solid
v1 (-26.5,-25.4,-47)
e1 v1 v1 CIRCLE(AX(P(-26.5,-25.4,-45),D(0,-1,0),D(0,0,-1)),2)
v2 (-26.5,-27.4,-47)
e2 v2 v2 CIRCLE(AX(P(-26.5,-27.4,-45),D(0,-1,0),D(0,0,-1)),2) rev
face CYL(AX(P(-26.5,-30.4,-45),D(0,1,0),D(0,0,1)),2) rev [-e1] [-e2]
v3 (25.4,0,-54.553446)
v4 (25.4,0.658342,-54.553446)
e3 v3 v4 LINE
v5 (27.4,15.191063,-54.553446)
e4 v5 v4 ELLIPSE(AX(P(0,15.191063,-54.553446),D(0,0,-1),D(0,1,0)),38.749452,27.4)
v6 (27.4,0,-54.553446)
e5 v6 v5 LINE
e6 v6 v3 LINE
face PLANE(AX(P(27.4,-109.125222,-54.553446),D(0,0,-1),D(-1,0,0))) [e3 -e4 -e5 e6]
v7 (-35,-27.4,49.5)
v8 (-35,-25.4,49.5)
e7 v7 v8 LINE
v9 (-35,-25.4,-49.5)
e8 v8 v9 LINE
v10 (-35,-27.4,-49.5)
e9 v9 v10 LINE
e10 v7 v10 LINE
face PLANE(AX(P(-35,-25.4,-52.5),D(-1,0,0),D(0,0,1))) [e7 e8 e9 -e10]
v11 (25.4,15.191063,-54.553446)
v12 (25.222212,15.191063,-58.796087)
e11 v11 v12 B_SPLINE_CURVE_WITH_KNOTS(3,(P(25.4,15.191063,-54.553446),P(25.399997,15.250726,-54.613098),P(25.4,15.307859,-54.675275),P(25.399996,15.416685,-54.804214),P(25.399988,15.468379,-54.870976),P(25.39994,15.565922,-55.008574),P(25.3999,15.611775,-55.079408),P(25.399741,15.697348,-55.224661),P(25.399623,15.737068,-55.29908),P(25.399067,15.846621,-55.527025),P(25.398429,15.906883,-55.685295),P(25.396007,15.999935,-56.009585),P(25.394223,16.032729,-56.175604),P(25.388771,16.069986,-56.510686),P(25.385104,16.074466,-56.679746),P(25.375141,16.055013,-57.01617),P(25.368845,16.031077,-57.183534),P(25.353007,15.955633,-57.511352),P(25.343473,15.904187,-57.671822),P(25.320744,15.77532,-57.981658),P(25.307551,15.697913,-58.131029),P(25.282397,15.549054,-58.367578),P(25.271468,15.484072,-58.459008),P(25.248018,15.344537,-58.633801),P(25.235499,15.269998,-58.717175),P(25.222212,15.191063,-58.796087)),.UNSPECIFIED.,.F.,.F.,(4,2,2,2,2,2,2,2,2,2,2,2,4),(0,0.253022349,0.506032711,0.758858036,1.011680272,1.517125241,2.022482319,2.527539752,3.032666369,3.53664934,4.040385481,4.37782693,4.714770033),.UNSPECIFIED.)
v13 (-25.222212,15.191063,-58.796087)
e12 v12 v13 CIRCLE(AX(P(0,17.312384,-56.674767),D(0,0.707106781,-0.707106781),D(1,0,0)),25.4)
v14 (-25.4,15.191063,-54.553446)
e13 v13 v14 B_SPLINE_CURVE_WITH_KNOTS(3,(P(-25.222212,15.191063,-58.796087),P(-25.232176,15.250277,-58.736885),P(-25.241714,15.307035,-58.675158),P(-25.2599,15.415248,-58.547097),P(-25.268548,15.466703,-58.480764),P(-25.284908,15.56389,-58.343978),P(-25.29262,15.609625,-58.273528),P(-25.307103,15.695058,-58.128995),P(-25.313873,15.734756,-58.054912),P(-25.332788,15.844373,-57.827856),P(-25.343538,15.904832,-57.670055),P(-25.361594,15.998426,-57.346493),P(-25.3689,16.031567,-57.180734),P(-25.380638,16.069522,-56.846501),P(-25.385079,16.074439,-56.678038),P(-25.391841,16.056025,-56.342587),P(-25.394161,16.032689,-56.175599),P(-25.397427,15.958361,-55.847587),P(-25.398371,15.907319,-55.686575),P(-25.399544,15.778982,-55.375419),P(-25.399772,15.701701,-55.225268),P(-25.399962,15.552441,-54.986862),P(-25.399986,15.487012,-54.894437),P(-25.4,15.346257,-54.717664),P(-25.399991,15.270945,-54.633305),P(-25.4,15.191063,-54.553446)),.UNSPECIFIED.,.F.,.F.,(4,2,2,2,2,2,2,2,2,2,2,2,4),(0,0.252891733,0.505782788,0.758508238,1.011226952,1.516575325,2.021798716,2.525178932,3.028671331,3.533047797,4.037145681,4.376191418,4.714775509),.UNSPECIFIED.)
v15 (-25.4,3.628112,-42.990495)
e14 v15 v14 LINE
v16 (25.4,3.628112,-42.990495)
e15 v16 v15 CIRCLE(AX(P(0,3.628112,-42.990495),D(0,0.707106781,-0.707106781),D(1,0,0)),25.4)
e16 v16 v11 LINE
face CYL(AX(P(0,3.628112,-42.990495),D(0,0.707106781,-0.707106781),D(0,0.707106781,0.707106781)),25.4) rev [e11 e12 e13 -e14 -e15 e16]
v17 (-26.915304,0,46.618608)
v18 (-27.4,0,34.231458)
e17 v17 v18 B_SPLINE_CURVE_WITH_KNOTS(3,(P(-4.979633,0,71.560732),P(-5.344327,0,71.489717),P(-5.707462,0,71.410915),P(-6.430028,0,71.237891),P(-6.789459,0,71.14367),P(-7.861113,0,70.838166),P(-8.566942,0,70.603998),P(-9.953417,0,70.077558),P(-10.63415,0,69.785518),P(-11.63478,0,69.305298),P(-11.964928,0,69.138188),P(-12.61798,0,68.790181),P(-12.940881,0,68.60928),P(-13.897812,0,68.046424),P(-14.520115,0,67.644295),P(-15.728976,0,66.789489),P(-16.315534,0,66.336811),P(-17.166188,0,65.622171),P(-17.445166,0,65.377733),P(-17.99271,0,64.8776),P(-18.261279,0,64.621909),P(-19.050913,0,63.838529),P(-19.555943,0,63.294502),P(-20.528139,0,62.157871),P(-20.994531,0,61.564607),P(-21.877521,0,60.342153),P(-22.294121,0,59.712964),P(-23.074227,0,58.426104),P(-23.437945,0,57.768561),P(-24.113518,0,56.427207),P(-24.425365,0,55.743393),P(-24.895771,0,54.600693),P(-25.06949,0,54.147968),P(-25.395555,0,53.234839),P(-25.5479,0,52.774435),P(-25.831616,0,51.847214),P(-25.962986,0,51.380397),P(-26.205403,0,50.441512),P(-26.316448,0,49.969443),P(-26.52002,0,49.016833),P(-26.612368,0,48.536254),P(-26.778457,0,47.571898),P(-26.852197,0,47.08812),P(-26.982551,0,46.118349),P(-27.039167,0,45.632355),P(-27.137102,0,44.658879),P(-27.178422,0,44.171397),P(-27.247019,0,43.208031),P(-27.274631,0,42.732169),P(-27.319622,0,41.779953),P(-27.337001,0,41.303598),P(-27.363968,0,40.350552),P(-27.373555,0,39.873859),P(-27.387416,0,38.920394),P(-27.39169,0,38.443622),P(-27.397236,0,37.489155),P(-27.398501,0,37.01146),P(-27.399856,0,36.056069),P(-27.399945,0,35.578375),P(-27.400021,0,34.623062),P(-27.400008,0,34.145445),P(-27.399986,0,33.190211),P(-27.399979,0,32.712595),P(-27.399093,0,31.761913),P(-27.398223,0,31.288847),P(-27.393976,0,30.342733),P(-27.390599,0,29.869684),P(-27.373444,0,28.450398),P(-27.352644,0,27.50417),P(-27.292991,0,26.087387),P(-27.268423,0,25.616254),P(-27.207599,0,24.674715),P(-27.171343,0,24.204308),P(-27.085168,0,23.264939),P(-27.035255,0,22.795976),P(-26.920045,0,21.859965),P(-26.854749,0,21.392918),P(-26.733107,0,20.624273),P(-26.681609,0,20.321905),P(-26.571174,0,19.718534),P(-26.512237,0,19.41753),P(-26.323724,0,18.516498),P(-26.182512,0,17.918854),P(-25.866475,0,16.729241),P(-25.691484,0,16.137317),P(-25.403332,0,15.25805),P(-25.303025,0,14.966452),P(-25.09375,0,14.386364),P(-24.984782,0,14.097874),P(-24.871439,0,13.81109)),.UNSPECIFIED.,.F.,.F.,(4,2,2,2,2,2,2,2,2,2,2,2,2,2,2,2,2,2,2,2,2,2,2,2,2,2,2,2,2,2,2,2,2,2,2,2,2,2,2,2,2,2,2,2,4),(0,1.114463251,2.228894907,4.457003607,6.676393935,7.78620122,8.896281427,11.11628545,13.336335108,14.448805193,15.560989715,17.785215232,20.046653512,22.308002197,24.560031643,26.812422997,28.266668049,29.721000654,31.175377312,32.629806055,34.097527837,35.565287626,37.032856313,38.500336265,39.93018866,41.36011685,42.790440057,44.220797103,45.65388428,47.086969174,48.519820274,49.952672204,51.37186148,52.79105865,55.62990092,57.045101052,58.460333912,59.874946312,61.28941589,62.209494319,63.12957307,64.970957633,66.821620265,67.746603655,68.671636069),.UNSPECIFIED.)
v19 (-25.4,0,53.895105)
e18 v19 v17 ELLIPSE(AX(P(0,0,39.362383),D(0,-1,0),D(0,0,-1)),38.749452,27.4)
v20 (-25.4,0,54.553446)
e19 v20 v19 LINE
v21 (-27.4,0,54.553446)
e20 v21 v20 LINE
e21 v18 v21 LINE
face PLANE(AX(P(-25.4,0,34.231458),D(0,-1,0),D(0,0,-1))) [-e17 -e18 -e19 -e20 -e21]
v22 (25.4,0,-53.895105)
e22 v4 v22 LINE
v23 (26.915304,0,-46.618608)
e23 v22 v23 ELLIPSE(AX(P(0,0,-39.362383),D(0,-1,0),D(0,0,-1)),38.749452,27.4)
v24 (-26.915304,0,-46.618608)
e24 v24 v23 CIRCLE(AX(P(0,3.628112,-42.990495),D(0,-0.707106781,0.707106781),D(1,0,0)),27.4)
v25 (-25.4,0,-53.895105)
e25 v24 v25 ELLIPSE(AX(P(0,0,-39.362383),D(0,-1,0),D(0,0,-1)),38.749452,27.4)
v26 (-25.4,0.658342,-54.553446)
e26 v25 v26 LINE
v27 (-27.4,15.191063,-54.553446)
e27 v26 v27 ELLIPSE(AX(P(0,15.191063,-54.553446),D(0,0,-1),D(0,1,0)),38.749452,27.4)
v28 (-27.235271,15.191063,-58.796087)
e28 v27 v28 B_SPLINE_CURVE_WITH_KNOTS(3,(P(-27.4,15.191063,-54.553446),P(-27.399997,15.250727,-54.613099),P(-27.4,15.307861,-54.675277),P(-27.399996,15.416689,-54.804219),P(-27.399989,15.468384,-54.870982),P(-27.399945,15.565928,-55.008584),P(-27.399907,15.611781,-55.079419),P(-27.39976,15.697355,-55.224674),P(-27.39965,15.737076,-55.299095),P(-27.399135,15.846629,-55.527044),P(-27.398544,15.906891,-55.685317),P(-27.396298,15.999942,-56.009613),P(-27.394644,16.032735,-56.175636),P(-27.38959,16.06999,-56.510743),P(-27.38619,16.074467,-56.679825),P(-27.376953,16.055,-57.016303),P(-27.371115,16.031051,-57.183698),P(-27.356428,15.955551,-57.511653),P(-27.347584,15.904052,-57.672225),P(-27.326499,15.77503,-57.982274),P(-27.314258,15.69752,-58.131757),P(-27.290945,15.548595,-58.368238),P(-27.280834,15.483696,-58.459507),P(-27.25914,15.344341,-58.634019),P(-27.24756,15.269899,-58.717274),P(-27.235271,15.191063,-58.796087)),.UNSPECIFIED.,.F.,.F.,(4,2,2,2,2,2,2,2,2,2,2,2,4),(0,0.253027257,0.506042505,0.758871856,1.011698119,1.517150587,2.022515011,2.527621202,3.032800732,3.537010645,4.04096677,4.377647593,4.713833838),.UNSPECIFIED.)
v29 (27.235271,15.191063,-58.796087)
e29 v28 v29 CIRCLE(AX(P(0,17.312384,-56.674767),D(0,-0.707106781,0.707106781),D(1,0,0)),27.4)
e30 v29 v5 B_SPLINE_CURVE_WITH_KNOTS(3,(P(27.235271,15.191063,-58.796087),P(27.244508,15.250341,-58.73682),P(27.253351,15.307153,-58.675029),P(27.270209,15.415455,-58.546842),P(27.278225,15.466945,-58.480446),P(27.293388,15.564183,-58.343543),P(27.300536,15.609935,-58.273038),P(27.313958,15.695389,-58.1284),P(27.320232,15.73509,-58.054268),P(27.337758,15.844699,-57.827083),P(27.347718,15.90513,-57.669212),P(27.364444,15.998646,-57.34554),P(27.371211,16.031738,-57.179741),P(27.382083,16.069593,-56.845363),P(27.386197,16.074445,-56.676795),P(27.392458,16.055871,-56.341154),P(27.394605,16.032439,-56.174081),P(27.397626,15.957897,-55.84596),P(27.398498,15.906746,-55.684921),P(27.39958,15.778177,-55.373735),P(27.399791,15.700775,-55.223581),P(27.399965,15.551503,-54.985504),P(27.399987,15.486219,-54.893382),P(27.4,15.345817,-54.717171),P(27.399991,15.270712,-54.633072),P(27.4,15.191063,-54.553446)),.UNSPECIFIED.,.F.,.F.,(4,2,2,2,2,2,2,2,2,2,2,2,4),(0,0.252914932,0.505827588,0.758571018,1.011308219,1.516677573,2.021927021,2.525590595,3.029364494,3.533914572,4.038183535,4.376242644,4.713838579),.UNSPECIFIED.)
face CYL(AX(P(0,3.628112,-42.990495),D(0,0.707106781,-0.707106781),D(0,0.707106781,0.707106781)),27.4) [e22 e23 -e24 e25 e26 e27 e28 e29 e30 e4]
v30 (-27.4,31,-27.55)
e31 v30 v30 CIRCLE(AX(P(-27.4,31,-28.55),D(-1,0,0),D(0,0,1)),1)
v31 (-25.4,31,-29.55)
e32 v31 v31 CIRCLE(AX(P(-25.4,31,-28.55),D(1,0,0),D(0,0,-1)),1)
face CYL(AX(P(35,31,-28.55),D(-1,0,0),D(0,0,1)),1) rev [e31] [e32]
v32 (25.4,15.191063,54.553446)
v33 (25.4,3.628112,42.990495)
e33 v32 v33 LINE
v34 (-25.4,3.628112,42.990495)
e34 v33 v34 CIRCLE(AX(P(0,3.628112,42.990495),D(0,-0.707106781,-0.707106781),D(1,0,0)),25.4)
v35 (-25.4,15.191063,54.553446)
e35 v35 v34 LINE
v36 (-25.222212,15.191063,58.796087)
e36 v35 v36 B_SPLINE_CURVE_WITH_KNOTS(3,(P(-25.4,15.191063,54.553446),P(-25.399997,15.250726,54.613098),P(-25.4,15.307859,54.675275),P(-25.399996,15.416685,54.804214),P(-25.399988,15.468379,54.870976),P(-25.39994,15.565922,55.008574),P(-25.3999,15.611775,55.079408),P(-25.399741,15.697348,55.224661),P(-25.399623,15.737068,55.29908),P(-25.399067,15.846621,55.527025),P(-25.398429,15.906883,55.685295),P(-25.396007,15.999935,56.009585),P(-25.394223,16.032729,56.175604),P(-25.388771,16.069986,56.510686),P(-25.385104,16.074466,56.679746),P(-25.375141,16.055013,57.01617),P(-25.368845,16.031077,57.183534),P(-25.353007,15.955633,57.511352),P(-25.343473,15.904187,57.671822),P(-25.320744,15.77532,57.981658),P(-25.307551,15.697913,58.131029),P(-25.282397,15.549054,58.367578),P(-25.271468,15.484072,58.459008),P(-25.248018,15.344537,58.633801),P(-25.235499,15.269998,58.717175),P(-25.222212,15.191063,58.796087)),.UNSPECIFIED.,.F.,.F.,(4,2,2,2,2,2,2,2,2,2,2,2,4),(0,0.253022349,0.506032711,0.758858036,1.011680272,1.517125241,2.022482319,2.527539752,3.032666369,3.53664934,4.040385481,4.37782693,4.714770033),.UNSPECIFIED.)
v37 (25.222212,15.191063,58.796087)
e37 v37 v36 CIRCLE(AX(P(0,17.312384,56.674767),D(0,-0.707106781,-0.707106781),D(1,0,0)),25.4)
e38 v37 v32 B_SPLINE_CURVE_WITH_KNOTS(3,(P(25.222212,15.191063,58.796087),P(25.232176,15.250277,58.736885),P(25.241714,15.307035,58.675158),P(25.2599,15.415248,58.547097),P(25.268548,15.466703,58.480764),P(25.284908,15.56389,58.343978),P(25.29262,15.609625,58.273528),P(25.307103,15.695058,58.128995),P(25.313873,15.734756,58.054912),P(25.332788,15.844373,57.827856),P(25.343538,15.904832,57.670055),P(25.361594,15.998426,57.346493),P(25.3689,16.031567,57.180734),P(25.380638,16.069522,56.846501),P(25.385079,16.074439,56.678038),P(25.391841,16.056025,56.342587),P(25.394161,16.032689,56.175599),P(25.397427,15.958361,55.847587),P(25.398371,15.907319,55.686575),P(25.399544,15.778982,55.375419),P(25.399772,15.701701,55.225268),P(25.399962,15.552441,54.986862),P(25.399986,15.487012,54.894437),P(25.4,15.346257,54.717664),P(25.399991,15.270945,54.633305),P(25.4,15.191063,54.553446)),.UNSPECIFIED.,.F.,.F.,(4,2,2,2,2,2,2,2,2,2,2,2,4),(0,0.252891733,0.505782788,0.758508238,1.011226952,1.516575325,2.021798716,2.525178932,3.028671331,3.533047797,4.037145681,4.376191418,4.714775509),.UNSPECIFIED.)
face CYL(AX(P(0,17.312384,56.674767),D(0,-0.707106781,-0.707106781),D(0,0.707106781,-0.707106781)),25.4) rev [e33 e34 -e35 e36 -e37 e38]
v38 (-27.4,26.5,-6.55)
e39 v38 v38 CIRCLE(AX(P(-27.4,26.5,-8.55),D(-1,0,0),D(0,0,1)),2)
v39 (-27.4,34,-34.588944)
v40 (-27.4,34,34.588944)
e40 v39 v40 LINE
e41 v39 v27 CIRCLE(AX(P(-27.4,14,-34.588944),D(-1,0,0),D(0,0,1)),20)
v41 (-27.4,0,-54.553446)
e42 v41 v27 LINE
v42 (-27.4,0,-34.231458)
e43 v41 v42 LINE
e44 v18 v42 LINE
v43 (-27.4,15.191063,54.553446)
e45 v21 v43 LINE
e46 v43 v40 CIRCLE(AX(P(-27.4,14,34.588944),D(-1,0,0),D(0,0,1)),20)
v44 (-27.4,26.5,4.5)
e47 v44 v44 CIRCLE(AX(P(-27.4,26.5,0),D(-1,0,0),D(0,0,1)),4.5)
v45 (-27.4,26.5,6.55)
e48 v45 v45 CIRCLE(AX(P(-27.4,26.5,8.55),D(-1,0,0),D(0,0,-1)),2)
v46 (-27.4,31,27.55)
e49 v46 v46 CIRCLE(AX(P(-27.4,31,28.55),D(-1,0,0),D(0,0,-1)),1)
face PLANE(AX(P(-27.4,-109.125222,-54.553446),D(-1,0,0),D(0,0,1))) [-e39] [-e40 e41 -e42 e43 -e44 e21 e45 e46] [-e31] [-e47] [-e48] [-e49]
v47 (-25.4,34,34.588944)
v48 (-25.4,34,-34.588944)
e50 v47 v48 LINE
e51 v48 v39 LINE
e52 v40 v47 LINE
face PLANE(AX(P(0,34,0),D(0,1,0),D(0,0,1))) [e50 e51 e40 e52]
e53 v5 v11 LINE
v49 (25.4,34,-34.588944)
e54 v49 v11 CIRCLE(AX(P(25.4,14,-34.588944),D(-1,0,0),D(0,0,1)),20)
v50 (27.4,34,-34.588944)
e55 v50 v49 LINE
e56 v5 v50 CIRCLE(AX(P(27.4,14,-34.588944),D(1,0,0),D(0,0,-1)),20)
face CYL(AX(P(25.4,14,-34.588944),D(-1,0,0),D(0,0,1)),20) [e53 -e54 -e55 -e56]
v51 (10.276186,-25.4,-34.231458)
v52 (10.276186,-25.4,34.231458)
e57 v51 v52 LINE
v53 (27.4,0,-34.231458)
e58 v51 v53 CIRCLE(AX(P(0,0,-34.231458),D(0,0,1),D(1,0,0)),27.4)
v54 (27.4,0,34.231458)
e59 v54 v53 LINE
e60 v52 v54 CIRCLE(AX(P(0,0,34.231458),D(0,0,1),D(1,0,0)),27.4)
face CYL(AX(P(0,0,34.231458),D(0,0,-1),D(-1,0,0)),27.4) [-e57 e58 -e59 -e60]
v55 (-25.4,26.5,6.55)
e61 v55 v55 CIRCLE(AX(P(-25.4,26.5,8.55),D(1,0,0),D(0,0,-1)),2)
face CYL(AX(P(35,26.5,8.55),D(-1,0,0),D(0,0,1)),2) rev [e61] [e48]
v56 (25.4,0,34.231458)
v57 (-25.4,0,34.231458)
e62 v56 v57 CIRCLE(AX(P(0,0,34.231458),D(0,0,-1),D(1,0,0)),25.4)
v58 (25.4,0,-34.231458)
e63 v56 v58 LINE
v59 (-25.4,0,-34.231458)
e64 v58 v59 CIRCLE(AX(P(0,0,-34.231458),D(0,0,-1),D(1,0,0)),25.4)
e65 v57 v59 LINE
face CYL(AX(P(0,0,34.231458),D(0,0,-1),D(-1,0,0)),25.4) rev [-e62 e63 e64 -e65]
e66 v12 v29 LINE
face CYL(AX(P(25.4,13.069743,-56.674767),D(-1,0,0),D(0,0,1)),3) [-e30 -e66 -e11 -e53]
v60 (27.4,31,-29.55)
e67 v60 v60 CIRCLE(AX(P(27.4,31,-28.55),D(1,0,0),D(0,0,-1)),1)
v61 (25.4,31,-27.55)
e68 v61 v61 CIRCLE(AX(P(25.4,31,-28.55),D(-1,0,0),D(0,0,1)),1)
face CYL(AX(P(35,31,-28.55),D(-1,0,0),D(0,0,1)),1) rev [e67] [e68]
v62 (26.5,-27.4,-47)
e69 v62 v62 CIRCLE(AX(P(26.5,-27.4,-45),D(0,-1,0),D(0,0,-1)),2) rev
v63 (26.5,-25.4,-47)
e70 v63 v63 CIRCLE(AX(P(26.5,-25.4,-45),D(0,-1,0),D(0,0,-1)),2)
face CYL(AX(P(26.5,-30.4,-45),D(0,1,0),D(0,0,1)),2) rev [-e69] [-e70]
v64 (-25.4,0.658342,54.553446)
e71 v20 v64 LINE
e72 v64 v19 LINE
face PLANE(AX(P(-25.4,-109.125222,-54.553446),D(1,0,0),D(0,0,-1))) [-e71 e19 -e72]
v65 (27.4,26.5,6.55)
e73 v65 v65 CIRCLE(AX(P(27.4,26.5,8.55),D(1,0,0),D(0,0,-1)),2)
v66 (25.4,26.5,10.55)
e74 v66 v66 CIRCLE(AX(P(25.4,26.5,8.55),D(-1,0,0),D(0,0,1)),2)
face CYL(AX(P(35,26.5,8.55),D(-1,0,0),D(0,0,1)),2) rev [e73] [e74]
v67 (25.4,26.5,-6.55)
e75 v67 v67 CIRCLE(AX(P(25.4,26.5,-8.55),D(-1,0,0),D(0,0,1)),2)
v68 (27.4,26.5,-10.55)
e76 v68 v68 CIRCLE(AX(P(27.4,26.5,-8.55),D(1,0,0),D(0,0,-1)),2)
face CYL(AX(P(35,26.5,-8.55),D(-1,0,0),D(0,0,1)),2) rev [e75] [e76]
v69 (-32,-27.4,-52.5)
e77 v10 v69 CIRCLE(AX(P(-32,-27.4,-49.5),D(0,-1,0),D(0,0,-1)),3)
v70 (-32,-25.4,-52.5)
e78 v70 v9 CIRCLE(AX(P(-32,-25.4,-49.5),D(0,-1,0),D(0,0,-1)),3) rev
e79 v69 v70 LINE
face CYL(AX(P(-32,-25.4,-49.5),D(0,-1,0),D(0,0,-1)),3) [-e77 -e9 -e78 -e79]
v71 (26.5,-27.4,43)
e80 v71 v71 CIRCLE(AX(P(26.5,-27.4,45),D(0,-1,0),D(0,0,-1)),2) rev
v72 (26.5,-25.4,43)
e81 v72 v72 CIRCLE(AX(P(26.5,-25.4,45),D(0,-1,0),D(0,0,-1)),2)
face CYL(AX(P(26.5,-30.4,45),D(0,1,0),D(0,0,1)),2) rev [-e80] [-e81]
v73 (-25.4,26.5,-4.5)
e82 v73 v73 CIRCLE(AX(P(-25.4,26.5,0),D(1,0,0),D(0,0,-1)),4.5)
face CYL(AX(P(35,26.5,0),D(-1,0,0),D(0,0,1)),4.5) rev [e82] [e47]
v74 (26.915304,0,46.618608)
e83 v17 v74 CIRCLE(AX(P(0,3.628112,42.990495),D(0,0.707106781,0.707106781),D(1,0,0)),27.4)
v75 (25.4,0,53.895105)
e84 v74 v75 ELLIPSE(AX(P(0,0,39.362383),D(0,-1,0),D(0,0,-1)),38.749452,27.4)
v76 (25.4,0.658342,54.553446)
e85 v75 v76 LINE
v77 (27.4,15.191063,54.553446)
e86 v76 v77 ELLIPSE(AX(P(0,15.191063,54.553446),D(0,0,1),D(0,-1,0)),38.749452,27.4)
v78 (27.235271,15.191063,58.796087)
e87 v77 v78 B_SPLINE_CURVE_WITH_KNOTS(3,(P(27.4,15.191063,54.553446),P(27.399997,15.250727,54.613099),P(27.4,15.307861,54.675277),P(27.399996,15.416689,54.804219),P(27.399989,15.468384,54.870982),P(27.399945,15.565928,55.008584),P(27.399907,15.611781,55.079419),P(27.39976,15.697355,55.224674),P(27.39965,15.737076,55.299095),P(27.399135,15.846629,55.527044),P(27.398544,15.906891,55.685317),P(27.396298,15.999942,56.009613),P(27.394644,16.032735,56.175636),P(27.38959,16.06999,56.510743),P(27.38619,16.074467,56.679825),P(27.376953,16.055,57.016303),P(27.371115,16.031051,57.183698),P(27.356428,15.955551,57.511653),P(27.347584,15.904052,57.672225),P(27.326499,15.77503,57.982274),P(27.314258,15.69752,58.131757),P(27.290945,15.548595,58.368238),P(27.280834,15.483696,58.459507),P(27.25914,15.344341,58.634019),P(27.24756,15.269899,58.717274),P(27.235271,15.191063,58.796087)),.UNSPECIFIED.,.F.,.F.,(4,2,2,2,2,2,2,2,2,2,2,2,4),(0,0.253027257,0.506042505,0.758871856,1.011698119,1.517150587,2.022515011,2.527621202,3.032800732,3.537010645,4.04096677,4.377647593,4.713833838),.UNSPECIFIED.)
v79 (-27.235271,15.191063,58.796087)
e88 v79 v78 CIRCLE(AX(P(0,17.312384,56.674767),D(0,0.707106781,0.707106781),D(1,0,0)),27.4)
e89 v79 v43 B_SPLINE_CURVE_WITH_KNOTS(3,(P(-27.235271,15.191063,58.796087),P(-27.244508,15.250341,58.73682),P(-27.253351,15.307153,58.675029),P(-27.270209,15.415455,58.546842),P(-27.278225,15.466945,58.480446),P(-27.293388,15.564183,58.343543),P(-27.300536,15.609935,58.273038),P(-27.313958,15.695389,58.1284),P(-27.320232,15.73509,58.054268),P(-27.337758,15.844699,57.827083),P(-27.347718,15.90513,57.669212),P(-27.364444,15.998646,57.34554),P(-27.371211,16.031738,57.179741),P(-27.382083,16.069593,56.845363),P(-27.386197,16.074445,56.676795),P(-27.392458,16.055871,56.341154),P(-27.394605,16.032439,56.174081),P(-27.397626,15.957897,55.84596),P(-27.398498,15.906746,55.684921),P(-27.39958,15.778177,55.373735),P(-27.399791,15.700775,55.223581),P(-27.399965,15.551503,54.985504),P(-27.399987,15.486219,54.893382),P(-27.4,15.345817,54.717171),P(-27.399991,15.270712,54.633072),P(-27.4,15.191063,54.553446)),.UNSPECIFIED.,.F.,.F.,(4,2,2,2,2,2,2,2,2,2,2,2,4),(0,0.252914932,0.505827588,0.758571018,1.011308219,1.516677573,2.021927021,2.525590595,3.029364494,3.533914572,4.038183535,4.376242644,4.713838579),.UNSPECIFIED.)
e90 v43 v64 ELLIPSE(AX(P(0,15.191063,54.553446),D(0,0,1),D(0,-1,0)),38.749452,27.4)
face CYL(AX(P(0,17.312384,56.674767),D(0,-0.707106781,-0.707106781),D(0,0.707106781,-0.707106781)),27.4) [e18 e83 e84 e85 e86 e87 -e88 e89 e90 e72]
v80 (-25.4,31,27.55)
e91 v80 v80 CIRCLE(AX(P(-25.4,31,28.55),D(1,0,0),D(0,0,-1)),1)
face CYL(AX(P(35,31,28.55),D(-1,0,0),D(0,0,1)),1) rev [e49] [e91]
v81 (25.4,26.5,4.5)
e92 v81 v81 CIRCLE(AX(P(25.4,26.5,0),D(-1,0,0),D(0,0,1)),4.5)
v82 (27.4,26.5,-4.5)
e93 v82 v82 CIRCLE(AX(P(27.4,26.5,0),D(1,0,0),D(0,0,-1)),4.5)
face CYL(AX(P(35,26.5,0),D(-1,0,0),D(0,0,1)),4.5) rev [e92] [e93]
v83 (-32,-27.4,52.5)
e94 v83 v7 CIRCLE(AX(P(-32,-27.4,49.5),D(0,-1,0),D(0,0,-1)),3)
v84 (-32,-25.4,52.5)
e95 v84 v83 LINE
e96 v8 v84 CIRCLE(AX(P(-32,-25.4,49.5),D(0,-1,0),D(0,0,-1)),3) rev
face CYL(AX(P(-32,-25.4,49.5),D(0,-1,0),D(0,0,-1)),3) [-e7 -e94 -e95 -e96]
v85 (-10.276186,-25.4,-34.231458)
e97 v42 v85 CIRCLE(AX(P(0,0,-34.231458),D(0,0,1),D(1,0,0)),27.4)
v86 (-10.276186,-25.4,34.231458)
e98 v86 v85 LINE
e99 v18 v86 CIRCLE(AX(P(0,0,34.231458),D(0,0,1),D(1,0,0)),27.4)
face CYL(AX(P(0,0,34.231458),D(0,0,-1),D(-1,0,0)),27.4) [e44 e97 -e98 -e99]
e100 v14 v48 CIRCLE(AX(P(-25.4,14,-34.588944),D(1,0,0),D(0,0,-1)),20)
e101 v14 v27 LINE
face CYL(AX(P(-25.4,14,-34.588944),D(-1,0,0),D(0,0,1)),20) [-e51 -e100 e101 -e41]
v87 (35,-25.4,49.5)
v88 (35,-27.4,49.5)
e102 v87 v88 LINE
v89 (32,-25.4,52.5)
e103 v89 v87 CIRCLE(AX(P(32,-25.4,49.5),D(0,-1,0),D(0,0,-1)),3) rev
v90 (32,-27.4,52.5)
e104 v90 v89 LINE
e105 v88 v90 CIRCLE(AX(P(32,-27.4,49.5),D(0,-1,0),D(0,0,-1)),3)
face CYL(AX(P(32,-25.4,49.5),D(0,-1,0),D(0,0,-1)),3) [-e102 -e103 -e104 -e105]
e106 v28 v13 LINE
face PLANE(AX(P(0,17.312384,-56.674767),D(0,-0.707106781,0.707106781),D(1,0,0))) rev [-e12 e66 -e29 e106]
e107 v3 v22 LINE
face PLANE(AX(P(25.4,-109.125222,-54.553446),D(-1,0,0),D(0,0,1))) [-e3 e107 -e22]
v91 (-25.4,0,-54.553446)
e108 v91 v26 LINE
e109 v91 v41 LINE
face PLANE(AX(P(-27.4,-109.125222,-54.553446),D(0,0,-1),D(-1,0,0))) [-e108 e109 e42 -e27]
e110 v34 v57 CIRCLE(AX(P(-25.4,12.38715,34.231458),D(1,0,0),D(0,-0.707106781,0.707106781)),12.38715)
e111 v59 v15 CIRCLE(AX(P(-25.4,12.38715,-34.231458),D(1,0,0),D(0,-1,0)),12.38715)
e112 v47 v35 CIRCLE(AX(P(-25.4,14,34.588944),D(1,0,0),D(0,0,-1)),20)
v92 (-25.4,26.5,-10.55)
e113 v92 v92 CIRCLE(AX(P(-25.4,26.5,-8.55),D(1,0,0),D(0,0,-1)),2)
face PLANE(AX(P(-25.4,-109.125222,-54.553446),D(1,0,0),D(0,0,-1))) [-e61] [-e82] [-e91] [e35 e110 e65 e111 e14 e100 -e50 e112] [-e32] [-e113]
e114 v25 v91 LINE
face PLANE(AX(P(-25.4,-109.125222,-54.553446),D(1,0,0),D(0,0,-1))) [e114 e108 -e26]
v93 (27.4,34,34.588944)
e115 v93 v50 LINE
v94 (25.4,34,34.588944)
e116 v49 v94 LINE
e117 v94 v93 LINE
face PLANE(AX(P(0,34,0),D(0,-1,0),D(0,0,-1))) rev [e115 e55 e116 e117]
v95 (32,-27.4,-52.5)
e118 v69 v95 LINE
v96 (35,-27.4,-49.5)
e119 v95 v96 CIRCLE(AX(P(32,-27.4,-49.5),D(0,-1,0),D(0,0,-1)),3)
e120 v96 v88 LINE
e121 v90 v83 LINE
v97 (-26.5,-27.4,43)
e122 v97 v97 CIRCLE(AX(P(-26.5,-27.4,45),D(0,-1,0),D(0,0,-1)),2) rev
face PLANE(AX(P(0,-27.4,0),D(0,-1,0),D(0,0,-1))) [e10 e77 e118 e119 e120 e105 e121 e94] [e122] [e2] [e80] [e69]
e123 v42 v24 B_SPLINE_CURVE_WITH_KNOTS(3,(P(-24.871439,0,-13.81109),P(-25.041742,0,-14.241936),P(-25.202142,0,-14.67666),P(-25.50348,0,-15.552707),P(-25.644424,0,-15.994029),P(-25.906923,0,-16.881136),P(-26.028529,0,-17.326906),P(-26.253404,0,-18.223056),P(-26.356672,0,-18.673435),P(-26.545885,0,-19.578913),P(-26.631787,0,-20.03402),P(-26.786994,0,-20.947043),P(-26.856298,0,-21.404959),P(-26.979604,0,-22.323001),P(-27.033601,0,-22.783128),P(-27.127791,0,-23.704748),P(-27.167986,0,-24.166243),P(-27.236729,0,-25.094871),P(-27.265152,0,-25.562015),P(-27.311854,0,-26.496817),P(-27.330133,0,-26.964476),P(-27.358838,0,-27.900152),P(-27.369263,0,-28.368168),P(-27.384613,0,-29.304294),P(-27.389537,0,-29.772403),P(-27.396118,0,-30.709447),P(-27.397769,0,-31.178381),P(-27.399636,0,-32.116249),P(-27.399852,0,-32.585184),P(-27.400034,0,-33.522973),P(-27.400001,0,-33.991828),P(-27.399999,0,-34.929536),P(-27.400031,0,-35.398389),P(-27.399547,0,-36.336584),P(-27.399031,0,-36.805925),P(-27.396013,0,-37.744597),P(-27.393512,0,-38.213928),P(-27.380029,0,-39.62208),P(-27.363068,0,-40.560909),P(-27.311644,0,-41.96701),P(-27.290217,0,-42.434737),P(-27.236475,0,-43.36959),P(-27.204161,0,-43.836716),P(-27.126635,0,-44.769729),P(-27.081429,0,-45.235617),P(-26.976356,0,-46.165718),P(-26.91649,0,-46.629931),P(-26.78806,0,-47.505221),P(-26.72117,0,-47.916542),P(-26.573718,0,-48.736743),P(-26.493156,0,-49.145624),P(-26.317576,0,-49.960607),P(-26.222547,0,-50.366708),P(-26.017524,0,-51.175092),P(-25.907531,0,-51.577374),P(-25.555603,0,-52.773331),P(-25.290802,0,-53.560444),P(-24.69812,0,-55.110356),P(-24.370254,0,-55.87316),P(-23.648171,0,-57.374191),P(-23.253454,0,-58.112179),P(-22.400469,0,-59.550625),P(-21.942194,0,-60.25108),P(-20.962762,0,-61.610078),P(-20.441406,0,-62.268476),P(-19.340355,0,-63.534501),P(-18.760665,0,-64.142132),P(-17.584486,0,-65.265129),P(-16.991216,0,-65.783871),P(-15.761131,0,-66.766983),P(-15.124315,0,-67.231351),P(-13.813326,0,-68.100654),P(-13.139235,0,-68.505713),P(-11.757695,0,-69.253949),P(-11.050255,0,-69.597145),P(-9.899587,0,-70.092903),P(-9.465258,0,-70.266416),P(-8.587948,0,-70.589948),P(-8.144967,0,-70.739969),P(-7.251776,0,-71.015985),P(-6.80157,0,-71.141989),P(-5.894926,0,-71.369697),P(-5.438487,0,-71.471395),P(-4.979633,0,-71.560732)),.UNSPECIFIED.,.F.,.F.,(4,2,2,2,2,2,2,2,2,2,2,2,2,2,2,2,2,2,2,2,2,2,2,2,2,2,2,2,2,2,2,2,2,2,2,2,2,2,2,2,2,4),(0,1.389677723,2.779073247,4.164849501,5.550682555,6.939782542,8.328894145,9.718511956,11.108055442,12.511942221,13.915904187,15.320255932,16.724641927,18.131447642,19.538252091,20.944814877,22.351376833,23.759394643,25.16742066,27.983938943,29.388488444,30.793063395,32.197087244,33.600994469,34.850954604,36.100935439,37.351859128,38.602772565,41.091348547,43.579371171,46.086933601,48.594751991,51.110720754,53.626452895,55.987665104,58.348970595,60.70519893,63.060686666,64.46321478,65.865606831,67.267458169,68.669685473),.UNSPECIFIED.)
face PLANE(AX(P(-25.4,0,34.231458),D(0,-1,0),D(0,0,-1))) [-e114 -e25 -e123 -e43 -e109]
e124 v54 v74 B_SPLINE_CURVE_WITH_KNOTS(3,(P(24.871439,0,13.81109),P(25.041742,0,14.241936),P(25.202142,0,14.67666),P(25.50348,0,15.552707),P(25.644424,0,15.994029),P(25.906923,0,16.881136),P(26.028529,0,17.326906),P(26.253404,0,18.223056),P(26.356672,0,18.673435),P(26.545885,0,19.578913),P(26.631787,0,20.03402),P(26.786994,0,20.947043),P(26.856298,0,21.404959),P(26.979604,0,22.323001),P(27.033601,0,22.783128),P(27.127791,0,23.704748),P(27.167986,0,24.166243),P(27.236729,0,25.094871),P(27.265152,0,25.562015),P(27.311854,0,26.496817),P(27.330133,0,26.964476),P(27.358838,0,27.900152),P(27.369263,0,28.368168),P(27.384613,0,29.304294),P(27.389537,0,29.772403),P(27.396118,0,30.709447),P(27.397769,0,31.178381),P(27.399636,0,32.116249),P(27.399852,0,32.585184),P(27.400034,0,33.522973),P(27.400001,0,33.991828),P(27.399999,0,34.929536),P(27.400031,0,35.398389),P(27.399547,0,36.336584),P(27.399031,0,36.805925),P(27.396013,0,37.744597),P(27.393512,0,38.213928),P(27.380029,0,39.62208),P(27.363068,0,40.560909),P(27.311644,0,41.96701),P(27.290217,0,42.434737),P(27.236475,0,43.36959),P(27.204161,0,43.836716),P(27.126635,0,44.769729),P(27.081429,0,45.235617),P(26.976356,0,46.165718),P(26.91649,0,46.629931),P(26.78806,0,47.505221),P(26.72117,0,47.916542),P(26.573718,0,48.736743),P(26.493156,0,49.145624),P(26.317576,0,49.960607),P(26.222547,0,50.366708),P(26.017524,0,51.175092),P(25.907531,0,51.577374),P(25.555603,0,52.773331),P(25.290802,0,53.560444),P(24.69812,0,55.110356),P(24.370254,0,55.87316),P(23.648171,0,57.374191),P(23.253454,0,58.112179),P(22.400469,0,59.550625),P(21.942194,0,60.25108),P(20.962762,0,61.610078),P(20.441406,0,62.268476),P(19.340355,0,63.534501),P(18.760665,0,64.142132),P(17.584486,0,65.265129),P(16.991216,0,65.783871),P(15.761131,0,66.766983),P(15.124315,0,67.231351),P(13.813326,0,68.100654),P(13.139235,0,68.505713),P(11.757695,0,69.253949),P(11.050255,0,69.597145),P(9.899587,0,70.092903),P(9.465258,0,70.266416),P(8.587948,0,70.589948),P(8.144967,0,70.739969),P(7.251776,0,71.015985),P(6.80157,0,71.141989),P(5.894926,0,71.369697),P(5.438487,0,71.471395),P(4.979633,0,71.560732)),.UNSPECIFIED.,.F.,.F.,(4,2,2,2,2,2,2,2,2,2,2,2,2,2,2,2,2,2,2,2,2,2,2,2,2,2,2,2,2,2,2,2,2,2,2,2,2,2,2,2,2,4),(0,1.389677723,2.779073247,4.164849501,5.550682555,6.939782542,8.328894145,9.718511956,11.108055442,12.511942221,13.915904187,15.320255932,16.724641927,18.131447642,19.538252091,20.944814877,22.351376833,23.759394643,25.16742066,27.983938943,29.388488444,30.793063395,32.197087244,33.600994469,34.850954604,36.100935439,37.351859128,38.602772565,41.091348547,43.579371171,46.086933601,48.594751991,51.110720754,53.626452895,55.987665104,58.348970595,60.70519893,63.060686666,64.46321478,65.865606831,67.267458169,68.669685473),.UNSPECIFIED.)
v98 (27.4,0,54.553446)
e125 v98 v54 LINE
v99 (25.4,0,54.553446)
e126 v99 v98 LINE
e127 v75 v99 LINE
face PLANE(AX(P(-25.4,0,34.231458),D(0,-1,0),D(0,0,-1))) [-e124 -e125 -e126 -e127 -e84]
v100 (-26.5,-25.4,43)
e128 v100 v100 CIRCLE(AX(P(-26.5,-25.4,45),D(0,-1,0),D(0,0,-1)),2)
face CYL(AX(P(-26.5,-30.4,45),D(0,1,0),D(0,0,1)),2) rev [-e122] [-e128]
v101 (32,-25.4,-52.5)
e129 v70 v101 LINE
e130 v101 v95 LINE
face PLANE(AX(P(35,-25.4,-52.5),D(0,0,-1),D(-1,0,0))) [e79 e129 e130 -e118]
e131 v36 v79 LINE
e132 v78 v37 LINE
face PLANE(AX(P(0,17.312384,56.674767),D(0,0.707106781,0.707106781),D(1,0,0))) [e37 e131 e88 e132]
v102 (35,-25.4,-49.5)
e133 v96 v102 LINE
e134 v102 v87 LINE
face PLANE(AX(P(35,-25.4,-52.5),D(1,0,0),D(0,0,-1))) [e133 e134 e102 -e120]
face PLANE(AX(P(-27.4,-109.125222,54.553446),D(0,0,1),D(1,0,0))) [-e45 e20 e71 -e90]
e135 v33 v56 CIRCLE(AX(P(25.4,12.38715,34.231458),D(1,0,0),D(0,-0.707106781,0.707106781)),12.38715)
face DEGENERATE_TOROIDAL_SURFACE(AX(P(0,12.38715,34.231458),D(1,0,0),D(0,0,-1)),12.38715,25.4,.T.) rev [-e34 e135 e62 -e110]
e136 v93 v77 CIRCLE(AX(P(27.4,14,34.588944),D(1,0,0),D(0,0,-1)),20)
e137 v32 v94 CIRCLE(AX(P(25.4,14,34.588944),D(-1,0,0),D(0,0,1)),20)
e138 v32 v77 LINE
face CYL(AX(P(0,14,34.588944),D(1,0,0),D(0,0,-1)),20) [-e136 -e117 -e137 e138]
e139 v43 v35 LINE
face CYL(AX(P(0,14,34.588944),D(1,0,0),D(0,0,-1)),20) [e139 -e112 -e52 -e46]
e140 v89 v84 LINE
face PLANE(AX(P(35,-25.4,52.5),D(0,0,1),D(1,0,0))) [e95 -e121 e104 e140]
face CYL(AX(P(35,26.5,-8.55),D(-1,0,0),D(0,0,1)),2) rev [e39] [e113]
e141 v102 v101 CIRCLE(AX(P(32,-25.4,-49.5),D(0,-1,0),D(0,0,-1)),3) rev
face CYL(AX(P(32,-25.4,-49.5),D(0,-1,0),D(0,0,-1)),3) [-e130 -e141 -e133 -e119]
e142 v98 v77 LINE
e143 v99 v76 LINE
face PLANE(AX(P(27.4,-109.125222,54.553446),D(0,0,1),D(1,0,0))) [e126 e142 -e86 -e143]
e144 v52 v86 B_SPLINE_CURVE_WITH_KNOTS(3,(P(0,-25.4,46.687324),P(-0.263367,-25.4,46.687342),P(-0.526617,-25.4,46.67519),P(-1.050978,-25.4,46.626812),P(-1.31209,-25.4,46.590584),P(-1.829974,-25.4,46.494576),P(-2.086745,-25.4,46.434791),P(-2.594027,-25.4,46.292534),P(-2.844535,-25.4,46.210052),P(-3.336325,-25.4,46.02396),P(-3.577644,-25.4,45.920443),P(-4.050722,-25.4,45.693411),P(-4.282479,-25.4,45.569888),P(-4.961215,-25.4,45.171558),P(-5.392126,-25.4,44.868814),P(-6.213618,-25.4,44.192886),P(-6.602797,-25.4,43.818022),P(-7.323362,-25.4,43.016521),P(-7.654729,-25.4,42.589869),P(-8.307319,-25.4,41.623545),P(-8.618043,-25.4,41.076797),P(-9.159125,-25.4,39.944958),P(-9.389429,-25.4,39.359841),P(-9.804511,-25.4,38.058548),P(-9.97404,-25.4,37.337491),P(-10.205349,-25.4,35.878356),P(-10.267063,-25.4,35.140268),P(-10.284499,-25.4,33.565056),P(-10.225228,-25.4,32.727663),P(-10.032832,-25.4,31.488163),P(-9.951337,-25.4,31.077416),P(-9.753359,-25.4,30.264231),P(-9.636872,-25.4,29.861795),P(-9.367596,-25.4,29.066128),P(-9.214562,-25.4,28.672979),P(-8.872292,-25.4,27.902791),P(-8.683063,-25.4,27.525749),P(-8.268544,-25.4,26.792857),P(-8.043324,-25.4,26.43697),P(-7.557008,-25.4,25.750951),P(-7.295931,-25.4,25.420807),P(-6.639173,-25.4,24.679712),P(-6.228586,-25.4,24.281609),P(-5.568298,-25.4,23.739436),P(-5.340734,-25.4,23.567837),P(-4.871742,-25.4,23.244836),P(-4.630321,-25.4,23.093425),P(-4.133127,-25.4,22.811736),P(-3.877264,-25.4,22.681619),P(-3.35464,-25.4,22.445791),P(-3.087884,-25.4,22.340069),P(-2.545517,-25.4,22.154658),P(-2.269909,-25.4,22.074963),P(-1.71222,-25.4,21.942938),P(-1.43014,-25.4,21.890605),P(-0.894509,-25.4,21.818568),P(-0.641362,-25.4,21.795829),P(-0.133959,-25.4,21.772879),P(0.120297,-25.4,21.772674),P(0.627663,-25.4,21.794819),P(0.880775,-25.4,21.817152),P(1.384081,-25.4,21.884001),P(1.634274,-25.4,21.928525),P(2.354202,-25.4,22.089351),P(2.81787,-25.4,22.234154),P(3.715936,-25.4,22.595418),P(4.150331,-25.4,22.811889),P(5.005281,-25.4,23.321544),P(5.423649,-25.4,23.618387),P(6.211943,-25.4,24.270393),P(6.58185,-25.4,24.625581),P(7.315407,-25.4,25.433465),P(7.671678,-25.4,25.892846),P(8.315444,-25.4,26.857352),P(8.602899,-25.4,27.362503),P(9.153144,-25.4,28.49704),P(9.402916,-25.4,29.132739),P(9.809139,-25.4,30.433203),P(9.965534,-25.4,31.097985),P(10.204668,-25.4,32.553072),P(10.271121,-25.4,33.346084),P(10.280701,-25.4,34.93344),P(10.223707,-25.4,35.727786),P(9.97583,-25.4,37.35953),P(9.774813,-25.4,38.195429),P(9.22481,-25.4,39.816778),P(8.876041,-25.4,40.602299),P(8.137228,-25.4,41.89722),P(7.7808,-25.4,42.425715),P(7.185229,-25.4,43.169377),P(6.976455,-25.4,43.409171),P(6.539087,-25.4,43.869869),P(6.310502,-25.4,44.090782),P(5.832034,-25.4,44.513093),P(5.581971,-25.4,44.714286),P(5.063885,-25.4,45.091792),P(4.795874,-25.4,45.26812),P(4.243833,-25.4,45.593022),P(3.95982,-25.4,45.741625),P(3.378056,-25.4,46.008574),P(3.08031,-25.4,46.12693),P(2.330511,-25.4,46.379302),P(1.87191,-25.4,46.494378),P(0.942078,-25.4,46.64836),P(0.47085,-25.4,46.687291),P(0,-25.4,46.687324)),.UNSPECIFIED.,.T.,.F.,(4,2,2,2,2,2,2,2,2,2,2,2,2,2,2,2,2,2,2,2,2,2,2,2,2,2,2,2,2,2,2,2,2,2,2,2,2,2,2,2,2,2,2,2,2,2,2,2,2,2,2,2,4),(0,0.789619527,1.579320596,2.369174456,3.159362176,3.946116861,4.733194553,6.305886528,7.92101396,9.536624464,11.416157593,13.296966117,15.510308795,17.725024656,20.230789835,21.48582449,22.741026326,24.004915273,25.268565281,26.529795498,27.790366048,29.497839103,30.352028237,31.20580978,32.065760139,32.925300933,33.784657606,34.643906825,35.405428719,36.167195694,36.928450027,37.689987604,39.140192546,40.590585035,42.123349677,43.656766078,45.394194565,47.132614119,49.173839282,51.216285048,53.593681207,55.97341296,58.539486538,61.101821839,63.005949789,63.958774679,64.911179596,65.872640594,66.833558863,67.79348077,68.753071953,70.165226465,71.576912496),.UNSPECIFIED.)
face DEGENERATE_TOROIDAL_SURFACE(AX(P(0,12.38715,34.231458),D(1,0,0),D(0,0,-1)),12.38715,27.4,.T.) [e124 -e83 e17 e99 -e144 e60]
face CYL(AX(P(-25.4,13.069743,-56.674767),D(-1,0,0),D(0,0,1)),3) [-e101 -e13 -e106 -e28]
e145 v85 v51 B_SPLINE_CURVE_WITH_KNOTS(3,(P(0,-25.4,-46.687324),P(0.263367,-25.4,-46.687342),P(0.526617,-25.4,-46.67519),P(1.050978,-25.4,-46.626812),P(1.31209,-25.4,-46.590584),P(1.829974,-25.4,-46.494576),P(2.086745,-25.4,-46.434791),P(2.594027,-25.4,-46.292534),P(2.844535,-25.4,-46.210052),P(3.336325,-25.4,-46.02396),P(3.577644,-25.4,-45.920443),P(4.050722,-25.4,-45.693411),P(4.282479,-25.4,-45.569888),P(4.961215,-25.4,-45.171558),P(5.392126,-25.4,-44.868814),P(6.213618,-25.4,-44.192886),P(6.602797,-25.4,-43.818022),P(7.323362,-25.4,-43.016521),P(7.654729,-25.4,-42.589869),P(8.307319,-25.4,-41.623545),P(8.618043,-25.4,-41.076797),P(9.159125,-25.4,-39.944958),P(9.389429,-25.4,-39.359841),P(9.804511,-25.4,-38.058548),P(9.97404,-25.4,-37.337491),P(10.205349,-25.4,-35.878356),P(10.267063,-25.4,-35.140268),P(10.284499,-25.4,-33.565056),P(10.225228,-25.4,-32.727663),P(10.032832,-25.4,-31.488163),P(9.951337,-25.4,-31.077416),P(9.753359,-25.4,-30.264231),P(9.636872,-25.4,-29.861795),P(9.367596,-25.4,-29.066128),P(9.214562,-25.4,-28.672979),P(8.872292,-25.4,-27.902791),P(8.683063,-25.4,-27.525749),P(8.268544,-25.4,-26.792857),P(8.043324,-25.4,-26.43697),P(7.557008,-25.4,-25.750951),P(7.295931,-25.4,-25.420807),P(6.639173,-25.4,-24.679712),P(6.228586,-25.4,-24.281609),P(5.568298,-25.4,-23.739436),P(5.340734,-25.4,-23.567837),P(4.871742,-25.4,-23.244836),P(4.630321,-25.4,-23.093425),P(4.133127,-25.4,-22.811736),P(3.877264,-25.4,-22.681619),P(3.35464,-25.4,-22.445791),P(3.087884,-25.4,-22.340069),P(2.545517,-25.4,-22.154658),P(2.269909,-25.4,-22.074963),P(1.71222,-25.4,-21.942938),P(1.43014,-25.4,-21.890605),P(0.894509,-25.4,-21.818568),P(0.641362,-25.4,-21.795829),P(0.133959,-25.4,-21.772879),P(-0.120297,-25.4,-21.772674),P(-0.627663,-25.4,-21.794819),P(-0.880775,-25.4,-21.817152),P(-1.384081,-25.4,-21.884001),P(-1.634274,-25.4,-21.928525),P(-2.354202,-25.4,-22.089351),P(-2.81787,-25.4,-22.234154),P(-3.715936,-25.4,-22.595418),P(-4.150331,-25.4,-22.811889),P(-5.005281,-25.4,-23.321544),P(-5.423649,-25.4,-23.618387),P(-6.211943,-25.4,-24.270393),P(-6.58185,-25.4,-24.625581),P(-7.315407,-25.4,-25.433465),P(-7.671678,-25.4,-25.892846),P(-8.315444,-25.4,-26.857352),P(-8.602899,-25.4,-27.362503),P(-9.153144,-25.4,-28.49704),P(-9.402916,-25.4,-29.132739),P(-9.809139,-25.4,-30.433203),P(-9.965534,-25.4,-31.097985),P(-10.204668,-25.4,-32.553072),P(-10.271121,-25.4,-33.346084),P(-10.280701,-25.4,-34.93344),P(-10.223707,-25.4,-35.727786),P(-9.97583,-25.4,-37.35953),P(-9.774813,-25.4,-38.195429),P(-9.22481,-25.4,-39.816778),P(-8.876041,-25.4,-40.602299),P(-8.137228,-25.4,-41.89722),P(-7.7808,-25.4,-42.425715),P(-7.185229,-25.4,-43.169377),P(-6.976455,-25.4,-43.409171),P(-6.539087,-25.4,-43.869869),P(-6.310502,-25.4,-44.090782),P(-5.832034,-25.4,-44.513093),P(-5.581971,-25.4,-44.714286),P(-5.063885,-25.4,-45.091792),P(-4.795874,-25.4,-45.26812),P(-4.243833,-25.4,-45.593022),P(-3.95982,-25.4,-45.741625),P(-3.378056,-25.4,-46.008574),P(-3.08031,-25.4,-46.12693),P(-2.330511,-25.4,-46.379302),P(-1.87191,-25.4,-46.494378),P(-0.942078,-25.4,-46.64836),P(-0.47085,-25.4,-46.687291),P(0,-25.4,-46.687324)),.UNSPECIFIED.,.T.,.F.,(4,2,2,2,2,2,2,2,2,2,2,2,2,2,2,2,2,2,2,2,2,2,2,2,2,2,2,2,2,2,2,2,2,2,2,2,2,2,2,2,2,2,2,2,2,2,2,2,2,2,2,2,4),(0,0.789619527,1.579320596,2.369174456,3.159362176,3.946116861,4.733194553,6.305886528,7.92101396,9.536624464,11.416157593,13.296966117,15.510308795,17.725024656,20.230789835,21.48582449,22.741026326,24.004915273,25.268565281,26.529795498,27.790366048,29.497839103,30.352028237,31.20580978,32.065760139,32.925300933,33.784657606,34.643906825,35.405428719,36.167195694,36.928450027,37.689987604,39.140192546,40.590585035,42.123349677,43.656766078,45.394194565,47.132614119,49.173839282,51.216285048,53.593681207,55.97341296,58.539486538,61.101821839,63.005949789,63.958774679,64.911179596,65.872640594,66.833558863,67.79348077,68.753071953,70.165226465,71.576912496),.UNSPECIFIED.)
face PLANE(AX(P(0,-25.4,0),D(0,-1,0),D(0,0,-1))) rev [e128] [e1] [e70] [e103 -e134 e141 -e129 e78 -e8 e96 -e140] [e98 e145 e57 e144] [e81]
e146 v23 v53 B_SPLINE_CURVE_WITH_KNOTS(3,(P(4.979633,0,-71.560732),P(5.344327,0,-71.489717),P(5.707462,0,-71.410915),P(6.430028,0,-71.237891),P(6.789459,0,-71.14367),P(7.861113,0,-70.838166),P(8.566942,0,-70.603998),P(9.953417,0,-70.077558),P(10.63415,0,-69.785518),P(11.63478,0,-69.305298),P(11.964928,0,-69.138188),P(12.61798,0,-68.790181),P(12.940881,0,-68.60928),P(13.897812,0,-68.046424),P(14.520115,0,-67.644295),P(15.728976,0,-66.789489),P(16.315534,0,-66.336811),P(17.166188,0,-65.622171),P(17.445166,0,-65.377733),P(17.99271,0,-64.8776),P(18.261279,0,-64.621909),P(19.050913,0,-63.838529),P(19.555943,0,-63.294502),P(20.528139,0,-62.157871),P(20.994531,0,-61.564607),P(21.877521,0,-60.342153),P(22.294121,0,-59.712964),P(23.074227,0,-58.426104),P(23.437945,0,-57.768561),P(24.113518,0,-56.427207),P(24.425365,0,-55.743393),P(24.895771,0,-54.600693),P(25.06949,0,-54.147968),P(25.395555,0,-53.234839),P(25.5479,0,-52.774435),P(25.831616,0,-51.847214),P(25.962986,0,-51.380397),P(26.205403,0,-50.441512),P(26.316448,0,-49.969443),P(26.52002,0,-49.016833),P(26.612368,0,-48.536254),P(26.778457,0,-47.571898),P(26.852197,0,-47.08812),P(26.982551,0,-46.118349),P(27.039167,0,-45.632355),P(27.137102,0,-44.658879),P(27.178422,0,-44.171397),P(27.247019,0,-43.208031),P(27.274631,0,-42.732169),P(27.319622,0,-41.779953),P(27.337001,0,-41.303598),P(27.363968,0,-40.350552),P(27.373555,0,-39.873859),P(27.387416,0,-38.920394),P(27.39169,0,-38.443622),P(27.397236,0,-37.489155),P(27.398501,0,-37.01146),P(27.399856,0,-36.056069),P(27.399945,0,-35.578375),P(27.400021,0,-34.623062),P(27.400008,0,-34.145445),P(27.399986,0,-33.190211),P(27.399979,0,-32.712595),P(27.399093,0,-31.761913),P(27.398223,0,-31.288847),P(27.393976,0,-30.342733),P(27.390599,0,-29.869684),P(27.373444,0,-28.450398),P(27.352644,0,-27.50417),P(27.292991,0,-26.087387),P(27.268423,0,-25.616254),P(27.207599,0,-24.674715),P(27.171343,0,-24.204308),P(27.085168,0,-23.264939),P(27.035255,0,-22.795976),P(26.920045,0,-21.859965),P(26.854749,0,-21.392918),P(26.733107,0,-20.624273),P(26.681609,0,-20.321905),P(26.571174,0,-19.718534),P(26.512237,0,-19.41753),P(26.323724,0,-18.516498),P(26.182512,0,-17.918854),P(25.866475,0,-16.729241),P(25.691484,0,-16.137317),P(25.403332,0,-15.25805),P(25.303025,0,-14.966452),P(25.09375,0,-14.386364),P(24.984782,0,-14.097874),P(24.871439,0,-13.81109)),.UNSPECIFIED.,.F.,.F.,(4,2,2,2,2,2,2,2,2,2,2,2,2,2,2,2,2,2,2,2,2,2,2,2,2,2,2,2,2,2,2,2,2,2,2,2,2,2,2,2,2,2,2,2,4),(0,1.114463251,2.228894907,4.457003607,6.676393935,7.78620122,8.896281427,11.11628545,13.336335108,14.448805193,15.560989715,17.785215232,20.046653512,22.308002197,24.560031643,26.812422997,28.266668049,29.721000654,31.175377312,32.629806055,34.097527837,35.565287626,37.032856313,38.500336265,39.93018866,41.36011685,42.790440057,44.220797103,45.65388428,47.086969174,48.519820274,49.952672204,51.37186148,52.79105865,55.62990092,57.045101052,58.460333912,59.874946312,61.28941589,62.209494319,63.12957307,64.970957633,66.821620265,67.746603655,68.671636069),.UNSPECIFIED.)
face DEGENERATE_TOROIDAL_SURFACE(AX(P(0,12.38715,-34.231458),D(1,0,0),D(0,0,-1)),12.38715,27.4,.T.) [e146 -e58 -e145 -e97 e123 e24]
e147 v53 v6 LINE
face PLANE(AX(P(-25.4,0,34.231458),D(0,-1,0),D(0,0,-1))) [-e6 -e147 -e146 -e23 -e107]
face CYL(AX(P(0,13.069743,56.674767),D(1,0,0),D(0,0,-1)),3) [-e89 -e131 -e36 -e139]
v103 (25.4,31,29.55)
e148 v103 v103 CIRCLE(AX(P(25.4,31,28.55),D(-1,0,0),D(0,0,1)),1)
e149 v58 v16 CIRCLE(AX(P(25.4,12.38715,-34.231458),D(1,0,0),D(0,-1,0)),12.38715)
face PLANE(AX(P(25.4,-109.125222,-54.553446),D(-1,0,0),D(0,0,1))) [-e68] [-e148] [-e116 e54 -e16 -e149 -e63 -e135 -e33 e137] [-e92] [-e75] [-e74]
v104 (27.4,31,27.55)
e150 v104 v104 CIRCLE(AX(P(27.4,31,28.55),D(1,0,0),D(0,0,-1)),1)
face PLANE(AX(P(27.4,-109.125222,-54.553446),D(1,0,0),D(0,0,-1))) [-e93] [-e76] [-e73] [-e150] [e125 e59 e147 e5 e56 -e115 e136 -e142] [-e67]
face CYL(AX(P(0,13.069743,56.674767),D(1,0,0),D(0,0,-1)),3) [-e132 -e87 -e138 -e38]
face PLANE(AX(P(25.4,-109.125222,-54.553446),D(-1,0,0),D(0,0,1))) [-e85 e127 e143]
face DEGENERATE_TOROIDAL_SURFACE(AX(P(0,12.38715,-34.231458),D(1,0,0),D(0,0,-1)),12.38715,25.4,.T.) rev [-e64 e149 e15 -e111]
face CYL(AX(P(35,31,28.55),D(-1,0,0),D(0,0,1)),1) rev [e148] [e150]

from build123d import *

# Parameters (mm, degrees)
SKETCH6_W           = 70
SKETCH6_H           = 105
BOSS_EXTRUDE1_DEPTH = 2
CUT_EXTRUDE1_START  = -25.4
SKETCH4_R           = 2
CUT_EXTRUDE1_DEPTH  = 5
FILLET1_R           = 3
FILLET2_R           = 3
BOSS_EXTRUDE2_REACH = 105.819
SKETCH9_W           = 2
SKETCH9_H           = 109.10689276
SKETCH10_R          = 2
SKETCH10_R_2        = 4.5
CUT_EXTRUDE2_DEPTH  = 105.083069428
SKETCH11_R          = 1
CUT_EXTRUDE4_DEPTH  = 105.083069428
FILLET4_R           = 20


with BuildPart() as part:
    # Sweep2: sweep along a path in Sketch3
    with BuildLine(Plane(origin=(0, 0, 0), x_dir=(0, 0, -1), z_dir=(1, 0, 0))) as sweep2_path:
        Line((76.2, -2.212849708), (62.515728753, -15.897120955))
        ThreePointArc((62.515728753, -15.897120955), (49.5387948, -24.568031008), (34.231457505, -27.612849708))
        Line((34.231457505, -27.612849708), (-34.231457505, -27.612849708))
        ThreePointArc((-34.231457505, -27.612849708), (-49.5387948, -24.568031008), (-62.515728753, -15.897120955))
        Line((-62.515728753, -15.897120955), (-76.2, -2.212849708))
    # Sketch1 → Sweep2 (sweep)
    with BuildSketch(Plane.XY):
        with BuildLine():
            Line((-25.4, 0), (-27.4, 0))
            ThreePointArc((-27.4, 0), (0, -27.4), (27.4, 0))
            Line((27.4, 0), (25.4, 0))
            ThreePointArc((25.4, 0), (0, -25.4), (-25.4, 0))
        make_face()
    sweep(path=sweep2_path.line)

    # Sketch6 → Boss-Extrude1 (add)
    with BuildSketch(Plane(origin=(0, -27.4, 0), x_dir=(-1, 0, 0), z_dir=(0, -1, 0))):
        Rectangle(SKETCH6_W, SKETCH6_H)
    extrude(amount=-BOSS_EXTRUDE1_DEPTH)

    # Sketch4 → Cut-Extrude1 (cut)
    with BuildSketch(Plane(origin=(0, 0, 0), x_dir=(1, 0, 0), z_dir=(0, 1, 0)).offset(CUT_EXTRUDE1_START)):
        with Locations(Location((-26.5, 45, 0), (0, 0, 90))):
            Circle(SKETCH4_R)
        with Locations(Location((26.5, 45, 0), (0, 0, 90))):
            Circle(SKETCH4_R)
        with Locations(Location((-26.5, -45, 0), (0, 0, 90))):
            Circle(SKETCH4_R)
        with Locations(Location((26.5, -45, 0), (0, 0, 90))):
            Circle(SKETCH4_R)
    extrude(amount=-CUT_EXTRUDE1_DEPTH, mode=Mode.SUBTRACT)

    # Fillet1
    fillet1_edges = [part.edges().sort_by_distance(p)[0] for p in [
        (26.4, 17.312383569, 56.674766724),
        (26.4, 17.312383569, -56.674766724),
        (-26.4, 17.312383569, -56.674766724),
        (-26.4, 17.312383569, 56.674766724),
    ]]
    fillet(fillet1_edges, radius=FILLET1_R)

    # Fillet2
    fillet2_edges = [part.edges().sort_by_distance(p)[0] for p in [
        (35, -26.4, 52.5),
        (35, -26.4, -52.5),
        (-35, -26.4, -52.5),
        (-35, -26.4, 52.5),
    ]]
    fillet(fillet2_edges, radius=FILLET2_R)

    # Boss-Extrude2: up to this face of the body (flat: up to its plane)
    boss_extrude2_end = Plane(part.part.faces().sort_by_distance((-26.4, 0, 0))[0])
    # Sketch9 → Boss-Extrude2 (add, up to the picked face)
    with BuildSketch(Plane(origin=(0, 34, 0), x_dir=(1, 0, 0), z_dir=(0, 1, 0)), mode=Mode.PRIVATE) as boss_extrude2_sk1:
        with Locations((-26.4, 0)):
            Rectangle(SKETCH9_W, SKETCH9_H)
    boss_extrude2_tool1 = split(extrude(boss_extrude2_sk1.sketch, amount=-BOSS_EXTRUDE2_REACH, mode=Mode.PRIVATE), bisect_by=boss_extrude2_end, keep=Keep.BOTH, mode=Mode.PRIVATE)
    # Sketch9 → Boss-Extrude2 (add, up to the picked face)
    with BuildSketch(Plane(origin=(0, 34, 0), x_dir=(1, 0, 0), z_dir=(0, 1, 0)), mode=Mode.PRIVATE) as boss_extrude2_sk2:
        with Locations((26.4, 0)):
            Rectangle(SKETCH9_W, SKETCH9_H)
    boss_extrude2_tool2 = split(extrude(boss_extrude2_sk2.sketch, amount=-BOSS_EXTRUDE2_REACH, mode=Mode.PRIVATE), bisect_by=boss_extrude2_end, keep=Keep.BOTH, mode=Mode.PRIVATE)
    add(boss_extrude2_tool1.solids().sort_by(Axis((-26.4, 34, 0), (0, -1, 0)))[0])
    add(boss_extrude2_tool2.solids().sort_by(Axis((26.4, 34, 0), (0, -1, 0)))[0])

    # Sketch10 → Cut-Extrude2 (cut, through all)
    with BuildSketch(Plane.ZY.offset(27.4)):
        with Locations((-8.55, 26.5)):
            Circle(SKETCH10_R)
        with Locations((8.55, 26.5)):
            Circle(SKETCH10_R)
        with Locations((0, 26.5)):
            Circle(SKETCH10_R_2)
    extrude(amount=-CUT_EXTRUDE2_DEPTH, mode=Mode.SUBTRACT)

    # Sketch11 → Cut-Extrude4 (cut, through all)
    with BuildSketch(Plane.ZY.offset(27.4)):
        with Locations((-28.55, 31)):
            Circle(SKETCH11_R)
        with Locations((28.55, 31)):
            Circle(SKETCH11_R)
    extrude(amount=-CUT_EXTRUDE4_DEPTH, mode=Mode.SUBTRACT)

    # Fillet4
    # the kernel refuses this fillet: 20 mm, written as the material it takes off along each edge
    with BuildSketch(Plane(origin=(77.311256771, 34, 54.55344638), x_dir=(0, 0, -1), z_dir=(-1, 0, 0)), Plane(origin=(24.511256771, 34, 54.55344638), x_dir=(0, 0, -1), z_dir=(-1, 0, 0)), Plane(origin=(-24.511256771, 34, -54.55344638), x_dir=(0, 0, 1), z_dir=(1, 0, 0)), Plane(origin=(-77.311256771, 34, -54.55344638), x_dir=(0, 0, 1), z_dir=(1, 0, 0))) as fillet4_piece_1:
        with BuildLine():
            CenterArc((19.964502708, 20), FILLET4_R, 183.414164929, 86.585835071)
            Line((0, 18.808936775), (0, 0))
            Line((0, 0), (19.964502708, 0))
        make_face()
    extrude(amount=101.822513542, mode=Mode.SUBTRACT)


solid = part.part
